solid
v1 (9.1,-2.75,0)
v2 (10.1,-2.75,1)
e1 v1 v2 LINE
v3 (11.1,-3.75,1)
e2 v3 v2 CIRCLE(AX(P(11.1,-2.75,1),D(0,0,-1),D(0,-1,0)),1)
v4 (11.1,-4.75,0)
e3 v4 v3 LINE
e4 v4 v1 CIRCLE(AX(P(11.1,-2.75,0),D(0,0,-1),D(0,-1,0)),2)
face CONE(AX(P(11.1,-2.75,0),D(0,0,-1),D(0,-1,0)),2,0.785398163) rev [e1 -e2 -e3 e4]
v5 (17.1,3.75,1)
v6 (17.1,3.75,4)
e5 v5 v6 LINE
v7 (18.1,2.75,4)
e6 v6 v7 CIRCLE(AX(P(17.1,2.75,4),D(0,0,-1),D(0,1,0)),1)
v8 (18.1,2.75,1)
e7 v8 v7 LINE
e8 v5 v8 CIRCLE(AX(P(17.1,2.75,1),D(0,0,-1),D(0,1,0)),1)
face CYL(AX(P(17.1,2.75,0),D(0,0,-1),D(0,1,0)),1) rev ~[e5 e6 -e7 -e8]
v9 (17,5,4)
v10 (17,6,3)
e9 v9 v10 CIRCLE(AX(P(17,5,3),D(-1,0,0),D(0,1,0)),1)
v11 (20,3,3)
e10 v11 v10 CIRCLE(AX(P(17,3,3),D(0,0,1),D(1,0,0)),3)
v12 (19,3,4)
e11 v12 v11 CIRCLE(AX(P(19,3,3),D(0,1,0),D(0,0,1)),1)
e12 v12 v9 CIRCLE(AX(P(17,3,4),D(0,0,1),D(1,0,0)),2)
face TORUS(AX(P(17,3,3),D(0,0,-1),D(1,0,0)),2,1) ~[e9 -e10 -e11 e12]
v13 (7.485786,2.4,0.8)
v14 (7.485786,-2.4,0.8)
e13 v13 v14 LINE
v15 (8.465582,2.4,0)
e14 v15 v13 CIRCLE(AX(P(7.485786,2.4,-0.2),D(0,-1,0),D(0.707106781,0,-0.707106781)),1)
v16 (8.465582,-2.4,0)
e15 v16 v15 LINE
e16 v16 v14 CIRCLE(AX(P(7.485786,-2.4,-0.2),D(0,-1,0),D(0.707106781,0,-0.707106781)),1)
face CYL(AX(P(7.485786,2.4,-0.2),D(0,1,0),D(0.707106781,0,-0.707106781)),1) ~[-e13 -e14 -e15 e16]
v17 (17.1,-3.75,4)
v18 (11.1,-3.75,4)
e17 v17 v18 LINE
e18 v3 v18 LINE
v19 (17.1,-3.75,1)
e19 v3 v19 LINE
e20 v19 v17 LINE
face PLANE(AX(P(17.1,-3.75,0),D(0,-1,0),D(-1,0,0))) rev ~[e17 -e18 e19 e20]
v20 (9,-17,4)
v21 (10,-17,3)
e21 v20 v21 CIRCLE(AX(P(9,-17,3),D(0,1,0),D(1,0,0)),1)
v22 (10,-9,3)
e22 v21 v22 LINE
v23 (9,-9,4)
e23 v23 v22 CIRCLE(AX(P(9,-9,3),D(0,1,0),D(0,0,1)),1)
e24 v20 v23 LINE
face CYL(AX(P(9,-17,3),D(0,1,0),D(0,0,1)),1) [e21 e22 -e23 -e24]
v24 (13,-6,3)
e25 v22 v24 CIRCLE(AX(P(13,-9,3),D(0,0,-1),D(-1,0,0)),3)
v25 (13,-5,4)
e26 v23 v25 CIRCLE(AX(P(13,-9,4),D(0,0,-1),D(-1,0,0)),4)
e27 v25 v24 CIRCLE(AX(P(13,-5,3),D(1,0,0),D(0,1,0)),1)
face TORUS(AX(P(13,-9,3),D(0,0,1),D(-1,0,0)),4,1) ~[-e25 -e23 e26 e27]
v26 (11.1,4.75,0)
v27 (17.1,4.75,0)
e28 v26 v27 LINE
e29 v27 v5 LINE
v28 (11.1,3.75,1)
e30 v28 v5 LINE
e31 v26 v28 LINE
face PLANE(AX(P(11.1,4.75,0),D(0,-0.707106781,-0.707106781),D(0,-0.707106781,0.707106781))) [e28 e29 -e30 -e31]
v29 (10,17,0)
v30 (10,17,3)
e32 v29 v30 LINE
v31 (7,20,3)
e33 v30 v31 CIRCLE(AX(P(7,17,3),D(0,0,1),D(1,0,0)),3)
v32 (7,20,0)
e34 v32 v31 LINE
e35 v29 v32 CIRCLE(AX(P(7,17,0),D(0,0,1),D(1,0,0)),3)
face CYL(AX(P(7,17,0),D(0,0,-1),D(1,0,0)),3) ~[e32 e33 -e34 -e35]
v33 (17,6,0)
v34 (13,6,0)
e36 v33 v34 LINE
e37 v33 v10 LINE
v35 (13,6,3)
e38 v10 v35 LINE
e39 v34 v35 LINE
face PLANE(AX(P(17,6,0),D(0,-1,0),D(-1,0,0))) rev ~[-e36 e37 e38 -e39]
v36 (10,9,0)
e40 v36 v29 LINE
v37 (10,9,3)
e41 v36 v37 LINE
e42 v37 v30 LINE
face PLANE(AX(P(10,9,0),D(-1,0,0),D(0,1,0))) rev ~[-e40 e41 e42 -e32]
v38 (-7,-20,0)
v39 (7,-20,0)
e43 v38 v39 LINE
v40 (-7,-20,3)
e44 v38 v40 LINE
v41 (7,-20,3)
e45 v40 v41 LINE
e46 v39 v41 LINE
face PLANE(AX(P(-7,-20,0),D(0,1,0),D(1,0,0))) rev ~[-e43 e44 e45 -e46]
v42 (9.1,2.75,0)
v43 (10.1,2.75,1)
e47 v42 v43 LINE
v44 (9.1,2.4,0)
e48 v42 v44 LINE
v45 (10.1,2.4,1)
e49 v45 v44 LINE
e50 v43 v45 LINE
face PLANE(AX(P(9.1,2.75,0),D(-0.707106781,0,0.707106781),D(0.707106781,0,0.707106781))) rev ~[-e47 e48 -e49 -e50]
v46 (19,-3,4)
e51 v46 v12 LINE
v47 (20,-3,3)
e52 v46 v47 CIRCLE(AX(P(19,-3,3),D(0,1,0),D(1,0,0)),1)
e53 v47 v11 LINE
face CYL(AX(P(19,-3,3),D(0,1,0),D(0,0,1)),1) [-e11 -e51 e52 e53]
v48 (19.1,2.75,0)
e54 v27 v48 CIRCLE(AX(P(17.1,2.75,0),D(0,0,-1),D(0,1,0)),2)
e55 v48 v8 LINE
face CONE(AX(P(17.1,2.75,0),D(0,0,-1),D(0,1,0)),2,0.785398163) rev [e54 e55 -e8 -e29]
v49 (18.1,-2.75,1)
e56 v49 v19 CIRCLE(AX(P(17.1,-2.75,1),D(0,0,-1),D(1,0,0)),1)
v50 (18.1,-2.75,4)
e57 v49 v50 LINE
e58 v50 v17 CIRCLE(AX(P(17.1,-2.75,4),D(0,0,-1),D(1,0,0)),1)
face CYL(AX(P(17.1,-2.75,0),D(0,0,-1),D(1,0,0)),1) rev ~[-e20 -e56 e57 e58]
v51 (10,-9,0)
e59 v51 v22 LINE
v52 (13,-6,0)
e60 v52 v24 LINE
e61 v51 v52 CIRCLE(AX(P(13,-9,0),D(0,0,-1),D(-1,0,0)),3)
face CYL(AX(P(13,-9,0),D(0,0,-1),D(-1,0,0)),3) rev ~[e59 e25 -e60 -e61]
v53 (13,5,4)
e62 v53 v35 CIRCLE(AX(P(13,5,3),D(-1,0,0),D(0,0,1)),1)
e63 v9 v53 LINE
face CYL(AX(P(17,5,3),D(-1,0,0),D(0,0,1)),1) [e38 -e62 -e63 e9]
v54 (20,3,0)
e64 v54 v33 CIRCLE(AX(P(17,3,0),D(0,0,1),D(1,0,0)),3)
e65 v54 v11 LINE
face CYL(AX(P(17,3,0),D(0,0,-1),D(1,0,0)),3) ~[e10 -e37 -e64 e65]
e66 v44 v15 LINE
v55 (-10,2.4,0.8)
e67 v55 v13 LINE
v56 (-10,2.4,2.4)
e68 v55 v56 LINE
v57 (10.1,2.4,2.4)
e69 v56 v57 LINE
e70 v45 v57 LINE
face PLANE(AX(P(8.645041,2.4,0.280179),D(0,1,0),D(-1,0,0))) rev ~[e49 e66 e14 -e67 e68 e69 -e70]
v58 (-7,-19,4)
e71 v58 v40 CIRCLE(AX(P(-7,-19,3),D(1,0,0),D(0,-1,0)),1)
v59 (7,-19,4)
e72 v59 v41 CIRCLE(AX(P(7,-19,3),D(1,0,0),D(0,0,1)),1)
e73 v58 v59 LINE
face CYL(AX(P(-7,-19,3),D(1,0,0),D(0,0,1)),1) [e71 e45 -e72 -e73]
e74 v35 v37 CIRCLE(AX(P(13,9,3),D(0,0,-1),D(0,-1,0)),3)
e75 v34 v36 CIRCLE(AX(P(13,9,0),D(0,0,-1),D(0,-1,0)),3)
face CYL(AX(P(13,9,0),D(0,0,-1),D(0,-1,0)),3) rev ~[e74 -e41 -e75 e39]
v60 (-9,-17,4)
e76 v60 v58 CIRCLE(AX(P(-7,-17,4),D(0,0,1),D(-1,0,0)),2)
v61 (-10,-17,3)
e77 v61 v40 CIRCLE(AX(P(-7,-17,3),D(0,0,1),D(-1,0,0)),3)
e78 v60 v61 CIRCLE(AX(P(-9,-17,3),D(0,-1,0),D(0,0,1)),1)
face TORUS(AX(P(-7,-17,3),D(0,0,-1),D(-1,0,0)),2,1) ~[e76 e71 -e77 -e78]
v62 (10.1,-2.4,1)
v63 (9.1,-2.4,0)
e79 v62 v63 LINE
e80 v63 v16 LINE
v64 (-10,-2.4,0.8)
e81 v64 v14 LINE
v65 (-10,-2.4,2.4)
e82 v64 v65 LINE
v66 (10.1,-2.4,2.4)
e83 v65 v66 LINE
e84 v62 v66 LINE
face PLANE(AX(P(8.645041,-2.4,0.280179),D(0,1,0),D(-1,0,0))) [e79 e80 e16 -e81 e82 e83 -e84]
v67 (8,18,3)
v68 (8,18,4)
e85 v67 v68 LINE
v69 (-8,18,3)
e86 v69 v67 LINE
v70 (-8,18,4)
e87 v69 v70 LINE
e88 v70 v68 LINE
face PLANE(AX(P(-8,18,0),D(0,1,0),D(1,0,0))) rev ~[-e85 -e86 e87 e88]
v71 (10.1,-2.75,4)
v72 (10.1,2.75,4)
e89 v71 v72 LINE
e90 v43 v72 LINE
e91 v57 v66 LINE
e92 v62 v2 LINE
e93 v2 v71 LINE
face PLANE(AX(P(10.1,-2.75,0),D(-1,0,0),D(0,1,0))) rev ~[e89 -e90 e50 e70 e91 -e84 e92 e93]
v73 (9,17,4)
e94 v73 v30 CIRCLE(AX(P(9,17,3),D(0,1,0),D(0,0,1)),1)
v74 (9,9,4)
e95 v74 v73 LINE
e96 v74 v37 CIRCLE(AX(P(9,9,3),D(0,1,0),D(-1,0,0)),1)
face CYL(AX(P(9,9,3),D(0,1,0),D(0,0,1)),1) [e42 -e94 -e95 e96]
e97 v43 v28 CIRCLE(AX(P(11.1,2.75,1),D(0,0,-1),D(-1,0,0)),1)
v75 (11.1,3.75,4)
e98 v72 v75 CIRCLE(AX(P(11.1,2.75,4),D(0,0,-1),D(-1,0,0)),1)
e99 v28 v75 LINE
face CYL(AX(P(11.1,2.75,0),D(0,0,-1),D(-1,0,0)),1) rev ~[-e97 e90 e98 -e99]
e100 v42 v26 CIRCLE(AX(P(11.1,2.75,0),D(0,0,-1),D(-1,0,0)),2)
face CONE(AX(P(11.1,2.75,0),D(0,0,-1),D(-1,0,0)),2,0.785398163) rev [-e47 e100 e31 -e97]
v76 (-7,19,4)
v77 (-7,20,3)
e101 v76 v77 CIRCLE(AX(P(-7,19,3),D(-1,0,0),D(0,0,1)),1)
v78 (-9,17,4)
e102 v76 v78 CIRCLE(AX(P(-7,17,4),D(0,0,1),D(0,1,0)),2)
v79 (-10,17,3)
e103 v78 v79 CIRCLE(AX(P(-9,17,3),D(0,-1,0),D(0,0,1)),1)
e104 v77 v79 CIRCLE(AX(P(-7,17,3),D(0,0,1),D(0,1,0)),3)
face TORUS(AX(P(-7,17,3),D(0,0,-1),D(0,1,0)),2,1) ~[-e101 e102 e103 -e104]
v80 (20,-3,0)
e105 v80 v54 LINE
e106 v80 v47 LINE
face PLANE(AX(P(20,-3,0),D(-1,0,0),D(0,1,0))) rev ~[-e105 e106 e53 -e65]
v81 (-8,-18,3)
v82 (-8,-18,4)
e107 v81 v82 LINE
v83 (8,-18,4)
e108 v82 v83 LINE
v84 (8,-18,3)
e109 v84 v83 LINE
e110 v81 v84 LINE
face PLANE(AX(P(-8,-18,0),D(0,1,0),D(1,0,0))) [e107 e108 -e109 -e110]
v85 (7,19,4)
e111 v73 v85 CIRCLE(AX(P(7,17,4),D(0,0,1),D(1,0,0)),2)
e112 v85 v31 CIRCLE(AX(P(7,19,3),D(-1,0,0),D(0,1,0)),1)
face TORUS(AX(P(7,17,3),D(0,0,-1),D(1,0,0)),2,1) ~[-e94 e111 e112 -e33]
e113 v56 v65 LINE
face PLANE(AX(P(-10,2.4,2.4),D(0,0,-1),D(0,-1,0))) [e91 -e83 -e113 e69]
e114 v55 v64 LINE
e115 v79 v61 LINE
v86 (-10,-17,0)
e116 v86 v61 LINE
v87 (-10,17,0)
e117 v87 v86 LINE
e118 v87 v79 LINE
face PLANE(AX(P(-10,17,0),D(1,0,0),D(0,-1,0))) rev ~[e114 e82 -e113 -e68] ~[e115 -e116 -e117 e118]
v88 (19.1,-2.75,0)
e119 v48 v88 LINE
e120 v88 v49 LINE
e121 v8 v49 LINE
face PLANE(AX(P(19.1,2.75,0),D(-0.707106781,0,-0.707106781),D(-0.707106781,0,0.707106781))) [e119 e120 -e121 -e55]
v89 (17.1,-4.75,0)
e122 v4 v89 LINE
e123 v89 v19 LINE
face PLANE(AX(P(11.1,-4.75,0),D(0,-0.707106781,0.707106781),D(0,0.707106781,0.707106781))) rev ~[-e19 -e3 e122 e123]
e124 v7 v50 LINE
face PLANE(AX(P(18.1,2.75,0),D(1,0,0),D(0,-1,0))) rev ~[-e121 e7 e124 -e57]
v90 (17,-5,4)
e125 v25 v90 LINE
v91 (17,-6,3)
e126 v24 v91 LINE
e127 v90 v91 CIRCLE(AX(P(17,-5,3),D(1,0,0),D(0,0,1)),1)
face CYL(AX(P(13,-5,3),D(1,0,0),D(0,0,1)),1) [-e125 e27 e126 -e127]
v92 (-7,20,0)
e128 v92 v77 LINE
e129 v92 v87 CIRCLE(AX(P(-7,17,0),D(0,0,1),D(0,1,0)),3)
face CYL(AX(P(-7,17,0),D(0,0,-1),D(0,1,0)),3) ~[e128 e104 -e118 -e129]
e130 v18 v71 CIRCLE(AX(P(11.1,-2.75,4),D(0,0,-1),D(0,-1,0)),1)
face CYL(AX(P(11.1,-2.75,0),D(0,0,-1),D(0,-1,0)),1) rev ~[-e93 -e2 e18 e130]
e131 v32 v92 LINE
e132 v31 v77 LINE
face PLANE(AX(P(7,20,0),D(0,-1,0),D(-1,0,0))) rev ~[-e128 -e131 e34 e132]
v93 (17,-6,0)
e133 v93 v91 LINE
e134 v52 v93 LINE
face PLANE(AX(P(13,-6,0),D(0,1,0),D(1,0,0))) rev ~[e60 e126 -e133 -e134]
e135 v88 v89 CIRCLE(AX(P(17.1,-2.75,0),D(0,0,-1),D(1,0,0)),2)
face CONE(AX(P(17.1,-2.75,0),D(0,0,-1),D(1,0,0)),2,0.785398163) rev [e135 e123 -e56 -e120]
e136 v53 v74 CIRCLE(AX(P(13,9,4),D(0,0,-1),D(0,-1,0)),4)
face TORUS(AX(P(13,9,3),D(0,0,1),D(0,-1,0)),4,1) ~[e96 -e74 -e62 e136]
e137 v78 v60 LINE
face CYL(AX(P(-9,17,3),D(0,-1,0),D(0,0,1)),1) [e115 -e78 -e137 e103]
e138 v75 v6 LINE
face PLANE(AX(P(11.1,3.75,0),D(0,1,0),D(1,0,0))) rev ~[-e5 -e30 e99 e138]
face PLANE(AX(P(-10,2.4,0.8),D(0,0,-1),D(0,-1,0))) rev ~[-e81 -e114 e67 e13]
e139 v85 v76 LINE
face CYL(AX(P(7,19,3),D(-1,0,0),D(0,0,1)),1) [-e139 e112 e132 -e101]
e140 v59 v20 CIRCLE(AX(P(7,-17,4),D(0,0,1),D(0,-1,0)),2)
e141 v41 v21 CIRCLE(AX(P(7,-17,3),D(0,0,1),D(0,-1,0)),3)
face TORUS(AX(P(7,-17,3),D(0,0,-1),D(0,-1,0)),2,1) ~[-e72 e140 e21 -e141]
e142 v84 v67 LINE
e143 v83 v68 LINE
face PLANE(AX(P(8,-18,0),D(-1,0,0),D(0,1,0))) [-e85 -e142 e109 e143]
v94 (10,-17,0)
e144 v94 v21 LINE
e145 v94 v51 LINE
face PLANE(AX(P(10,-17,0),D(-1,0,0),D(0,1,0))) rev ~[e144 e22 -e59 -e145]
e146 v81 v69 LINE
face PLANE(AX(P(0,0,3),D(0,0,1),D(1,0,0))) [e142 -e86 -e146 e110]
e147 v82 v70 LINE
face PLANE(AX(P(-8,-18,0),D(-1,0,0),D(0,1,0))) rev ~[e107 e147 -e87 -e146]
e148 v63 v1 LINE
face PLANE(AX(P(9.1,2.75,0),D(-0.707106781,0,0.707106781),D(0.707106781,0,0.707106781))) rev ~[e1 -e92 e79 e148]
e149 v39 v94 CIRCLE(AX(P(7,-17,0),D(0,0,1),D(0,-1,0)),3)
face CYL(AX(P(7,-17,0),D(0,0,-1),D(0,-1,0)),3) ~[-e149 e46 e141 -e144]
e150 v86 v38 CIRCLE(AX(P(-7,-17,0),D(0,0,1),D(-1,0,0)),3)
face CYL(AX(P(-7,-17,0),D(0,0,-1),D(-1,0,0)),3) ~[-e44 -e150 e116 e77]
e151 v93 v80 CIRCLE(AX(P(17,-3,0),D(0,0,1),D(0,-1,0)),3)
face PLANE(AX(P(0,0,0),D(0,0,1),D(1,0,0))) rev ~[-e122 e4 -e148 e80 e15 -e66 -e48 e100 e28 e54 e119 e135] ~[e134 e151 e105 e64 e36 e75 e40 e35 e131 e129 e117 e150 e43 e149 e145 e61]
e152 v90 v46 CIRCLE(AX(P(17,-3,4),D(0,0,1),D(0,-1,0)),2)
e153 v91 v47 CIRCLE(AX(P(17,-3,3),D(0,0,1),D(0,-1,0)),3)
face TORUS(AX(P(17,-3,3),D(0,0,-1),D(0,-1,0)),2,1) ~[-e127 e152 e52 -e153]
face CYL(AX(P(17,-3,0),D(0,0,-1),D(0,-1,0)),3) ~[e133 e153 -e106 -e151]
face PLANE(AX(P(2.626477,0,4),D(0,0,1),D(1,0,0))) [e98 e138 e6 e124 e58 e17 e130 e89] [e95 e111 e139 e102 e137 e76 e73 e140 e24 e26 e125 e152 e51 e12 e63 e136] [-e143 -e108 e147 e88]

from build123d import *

# Parameters (mm, degrees)
F0_W         = 16
F0_H         = 36
F1_DEPTH     = 4
F2_DEPTH     = 3
F3_W         = 4.8
F3_H         = 1.6
F4_DEPTH     = 20.1
F5_T1_DEPTH  = 5.5
F5_T3_DEPTH  = 6
F5_T6_ANGLE  = 90
F5_T8_ANGLE  = 90
F5_T10_ANGLE = 90
F5_T12_ANGLE = 90
F6_T1_DEPTH  = 4.8
F7_R         = 1


# Not quite as in the source:
# - a fillet or chamfer that OpenCascade refuses, or shapes differently, is made with other operations: its cross-section is extruded or revolved along the edge and cut away or added


with BuildPart() as f1:
    # F0 (on Top) → F1 (new body)
    with BuildSketch(Plane.XY):
        with BuildLine():
            ThreePointArc((10, 17), (9.1213203436, 19.1213203436), (7, 20))
            Line((7, 20), (-7, 20))
            ThreePointArc((-7, 20), (-9.1213203436, 19.1213203436), (-10, 17))
            Line((-10, 17), (-10, -17))
            ThreePointArc((-10, -17), (-9.1213203436, -19.1213203436), (-7, -20))
            Line((-7, -20), (7, -20))
            ThreePointArc((7, -20), (9.1213203436, -19.1213203436), (10, -17))
            Line((10, -17), (10, -9))
            ThreePointArc((10, -9), (10.8786796564, -6.8786796564), (13, -6))
            Line((13, -6), (17, -6))
            ThreePointArc((17, -6), (19.1213203436, -5.1213203436), (20, -3))
            Line((20, -3), (20, 3))
            ThreePointArc((20, 3), (19.1213203436, 5.1213203436), (17, 6))
            Line((17, 6), (13, 6))
            ThreePointArc((13, 6), (10.8786796564, 6.8786796564), (10, 9))
            Line((10, 9), (10, 17))
        make_face()
        Rectangle(F0_W, F0_H, mode=Mode.SUBTRACT)
        with BuildLine():
            ThreePointArc((10.1, 2.75), (10.3928932188, 3.4571067812), (11.1, 3.75))
            Line((11.1, 3.75), (17.1, 3.75))
            ThreePointArc((17.1, 3.75), (17.8071067812, 3.4571067812), (18.1, 2.75))
            Line((18.1, 2.75), (18.1, -2.75))
            ThreePointArc((18.1, -2.75), (17.8071067812, -3.4571067812), (17.1, -3.75))
            Line((17.1, -3.75), (11.1, -3.75))
            ThreePointArc((11.1, -3.75), (10.3928932188, -3.4571067812), (10.1, -2.75))
            Line((10.1, -2.75), (10.1, 2.75))
        make_face(mode=Mode.SUBTRACT)
    extrude(amount=F1_DEPTH)

    # F0 (on Top) → F2 (join)
    with BuildSketch(Plane.XY):
        Rectangle(F0_W, F0_H)
    extrude(amount=F2_DEPTH)

    # F3 (on face) → F4 (cut, through all)
    with BuildSketch(Plane(origin=(-10, 0, 0), x_dir=(0, -1, 0), z_dir=(-1, 0, 0))):
        with Locations((0, 1.6)):
            Rectangle(F3_W, F3_H)
    extrude(amount=-F4_DEPTH, mode=Mode.SUBTRACT)

    # F5: chamfer of 1 on 1 edges, made by hand

    # F5_s2 → F5_t1 (cut)
    with BuildSketch(Plane.XZ.offset(-2.75)):
        Polygon((19.1, 0), (18.1, 1), (18.1, 0), align=None)
        Polygon((9.1, 0), (10.1, 1), (10.1, 0), align=None)
    extrude(amount=F5_T1_DEPTH, mode=Mode.SUBTRACT)

    # F5_s4 → F5_t3 (cut)
    with BuildSketch(Plane.YZ.offset(11.1)):
        Polygon((-4.75, 0), (-3.75, 1), (-3.75, 0), align=None)
        Polygon((4.75, 0), (3.75, 1), (3.75, 0), align=None)
    extrude(amount=F5_T3_DEPTH, mode=Mode.SUBTRACT)

    # F5_s5 → F5_t6 (revolve, cut)
    with BuildSketch(Plane.YZ.offset(17.1)):
        Polygon((4.75, 0), (3.75, 1), (3.75, 0), align=None)
    revolve(axis=Axis((17.1, 2.75, 0), (0, 0, -1)), revolution_arc=F5_T6_ANGLE, mode=Mode.SUBTRACT)

    # F5_s7 → F5_t8 (revolve, cut)
    with BuildSketch(Plane.XZ.offset(2.75)):
        Polygon((19.1, 0), (18.1, 1), (18.1, 0), align=None)
    revolve(axis=Axis((17.1, -2.75, 0), (0, 0, -1)), revolution_arc=F5_T8_ANGLE, mode=Mode.SUBTRACT)

    # F5_s9 → F5_t10 (revolve, cut)
    with BuildSketch(Plane.YZ.offset(11.1)):
        Polygon((-4.75, 0), (-3.75, 1), (-3.75, 0), align=None)
    revolve(axis=Axis((11.1, -2.75, 0), (0, 0, -1)), revolution_arc=F5_T10_ANGLE, mode=Mode.SUBTRACT)

    # F5_s11 → F5_t12 (revolve, cut)
    with BuildSketch(Plane.XZ.offset(-2.75)):
        Polygon((9.1, 0), (10.1, 1), (10.1, 0), align=None)
    revolve(axis=Axis((11.1, 2.75, 0), (0, 0, -1)), revolution_arc=F5_T12_ANGLE, mode=Mode.SUBTRACT)

    # F6: fillet of radius 1 on 1 edges, made by hand

    # F6_s2 → F6_t1 (cut)
    with BuildSketch(Plane.XZ.offset(-2.4)):
        with BuildLine():
            ThreePointArc((8.1928932188, -0.9071067812), (8.4096659701, 0.1826834324), (7.4857864376, 0.8))
            Line((7.4857864376, 0.8), (9.9, 0.8))
            Line((9.9, 0.8), (8.1928932188, -0.9071067812))
        make_face()
    extrude(amount=F6_T1_DEPTH, mode=Mode.SUBTRACT)

    # F7
    f7_edges = [f1.edges().sort_by_distance(p)[0] for p in [
        (-10, 0, 4),
    ]]
    fillet(f7_edges, radius=F7_R)


solid = f1.part
